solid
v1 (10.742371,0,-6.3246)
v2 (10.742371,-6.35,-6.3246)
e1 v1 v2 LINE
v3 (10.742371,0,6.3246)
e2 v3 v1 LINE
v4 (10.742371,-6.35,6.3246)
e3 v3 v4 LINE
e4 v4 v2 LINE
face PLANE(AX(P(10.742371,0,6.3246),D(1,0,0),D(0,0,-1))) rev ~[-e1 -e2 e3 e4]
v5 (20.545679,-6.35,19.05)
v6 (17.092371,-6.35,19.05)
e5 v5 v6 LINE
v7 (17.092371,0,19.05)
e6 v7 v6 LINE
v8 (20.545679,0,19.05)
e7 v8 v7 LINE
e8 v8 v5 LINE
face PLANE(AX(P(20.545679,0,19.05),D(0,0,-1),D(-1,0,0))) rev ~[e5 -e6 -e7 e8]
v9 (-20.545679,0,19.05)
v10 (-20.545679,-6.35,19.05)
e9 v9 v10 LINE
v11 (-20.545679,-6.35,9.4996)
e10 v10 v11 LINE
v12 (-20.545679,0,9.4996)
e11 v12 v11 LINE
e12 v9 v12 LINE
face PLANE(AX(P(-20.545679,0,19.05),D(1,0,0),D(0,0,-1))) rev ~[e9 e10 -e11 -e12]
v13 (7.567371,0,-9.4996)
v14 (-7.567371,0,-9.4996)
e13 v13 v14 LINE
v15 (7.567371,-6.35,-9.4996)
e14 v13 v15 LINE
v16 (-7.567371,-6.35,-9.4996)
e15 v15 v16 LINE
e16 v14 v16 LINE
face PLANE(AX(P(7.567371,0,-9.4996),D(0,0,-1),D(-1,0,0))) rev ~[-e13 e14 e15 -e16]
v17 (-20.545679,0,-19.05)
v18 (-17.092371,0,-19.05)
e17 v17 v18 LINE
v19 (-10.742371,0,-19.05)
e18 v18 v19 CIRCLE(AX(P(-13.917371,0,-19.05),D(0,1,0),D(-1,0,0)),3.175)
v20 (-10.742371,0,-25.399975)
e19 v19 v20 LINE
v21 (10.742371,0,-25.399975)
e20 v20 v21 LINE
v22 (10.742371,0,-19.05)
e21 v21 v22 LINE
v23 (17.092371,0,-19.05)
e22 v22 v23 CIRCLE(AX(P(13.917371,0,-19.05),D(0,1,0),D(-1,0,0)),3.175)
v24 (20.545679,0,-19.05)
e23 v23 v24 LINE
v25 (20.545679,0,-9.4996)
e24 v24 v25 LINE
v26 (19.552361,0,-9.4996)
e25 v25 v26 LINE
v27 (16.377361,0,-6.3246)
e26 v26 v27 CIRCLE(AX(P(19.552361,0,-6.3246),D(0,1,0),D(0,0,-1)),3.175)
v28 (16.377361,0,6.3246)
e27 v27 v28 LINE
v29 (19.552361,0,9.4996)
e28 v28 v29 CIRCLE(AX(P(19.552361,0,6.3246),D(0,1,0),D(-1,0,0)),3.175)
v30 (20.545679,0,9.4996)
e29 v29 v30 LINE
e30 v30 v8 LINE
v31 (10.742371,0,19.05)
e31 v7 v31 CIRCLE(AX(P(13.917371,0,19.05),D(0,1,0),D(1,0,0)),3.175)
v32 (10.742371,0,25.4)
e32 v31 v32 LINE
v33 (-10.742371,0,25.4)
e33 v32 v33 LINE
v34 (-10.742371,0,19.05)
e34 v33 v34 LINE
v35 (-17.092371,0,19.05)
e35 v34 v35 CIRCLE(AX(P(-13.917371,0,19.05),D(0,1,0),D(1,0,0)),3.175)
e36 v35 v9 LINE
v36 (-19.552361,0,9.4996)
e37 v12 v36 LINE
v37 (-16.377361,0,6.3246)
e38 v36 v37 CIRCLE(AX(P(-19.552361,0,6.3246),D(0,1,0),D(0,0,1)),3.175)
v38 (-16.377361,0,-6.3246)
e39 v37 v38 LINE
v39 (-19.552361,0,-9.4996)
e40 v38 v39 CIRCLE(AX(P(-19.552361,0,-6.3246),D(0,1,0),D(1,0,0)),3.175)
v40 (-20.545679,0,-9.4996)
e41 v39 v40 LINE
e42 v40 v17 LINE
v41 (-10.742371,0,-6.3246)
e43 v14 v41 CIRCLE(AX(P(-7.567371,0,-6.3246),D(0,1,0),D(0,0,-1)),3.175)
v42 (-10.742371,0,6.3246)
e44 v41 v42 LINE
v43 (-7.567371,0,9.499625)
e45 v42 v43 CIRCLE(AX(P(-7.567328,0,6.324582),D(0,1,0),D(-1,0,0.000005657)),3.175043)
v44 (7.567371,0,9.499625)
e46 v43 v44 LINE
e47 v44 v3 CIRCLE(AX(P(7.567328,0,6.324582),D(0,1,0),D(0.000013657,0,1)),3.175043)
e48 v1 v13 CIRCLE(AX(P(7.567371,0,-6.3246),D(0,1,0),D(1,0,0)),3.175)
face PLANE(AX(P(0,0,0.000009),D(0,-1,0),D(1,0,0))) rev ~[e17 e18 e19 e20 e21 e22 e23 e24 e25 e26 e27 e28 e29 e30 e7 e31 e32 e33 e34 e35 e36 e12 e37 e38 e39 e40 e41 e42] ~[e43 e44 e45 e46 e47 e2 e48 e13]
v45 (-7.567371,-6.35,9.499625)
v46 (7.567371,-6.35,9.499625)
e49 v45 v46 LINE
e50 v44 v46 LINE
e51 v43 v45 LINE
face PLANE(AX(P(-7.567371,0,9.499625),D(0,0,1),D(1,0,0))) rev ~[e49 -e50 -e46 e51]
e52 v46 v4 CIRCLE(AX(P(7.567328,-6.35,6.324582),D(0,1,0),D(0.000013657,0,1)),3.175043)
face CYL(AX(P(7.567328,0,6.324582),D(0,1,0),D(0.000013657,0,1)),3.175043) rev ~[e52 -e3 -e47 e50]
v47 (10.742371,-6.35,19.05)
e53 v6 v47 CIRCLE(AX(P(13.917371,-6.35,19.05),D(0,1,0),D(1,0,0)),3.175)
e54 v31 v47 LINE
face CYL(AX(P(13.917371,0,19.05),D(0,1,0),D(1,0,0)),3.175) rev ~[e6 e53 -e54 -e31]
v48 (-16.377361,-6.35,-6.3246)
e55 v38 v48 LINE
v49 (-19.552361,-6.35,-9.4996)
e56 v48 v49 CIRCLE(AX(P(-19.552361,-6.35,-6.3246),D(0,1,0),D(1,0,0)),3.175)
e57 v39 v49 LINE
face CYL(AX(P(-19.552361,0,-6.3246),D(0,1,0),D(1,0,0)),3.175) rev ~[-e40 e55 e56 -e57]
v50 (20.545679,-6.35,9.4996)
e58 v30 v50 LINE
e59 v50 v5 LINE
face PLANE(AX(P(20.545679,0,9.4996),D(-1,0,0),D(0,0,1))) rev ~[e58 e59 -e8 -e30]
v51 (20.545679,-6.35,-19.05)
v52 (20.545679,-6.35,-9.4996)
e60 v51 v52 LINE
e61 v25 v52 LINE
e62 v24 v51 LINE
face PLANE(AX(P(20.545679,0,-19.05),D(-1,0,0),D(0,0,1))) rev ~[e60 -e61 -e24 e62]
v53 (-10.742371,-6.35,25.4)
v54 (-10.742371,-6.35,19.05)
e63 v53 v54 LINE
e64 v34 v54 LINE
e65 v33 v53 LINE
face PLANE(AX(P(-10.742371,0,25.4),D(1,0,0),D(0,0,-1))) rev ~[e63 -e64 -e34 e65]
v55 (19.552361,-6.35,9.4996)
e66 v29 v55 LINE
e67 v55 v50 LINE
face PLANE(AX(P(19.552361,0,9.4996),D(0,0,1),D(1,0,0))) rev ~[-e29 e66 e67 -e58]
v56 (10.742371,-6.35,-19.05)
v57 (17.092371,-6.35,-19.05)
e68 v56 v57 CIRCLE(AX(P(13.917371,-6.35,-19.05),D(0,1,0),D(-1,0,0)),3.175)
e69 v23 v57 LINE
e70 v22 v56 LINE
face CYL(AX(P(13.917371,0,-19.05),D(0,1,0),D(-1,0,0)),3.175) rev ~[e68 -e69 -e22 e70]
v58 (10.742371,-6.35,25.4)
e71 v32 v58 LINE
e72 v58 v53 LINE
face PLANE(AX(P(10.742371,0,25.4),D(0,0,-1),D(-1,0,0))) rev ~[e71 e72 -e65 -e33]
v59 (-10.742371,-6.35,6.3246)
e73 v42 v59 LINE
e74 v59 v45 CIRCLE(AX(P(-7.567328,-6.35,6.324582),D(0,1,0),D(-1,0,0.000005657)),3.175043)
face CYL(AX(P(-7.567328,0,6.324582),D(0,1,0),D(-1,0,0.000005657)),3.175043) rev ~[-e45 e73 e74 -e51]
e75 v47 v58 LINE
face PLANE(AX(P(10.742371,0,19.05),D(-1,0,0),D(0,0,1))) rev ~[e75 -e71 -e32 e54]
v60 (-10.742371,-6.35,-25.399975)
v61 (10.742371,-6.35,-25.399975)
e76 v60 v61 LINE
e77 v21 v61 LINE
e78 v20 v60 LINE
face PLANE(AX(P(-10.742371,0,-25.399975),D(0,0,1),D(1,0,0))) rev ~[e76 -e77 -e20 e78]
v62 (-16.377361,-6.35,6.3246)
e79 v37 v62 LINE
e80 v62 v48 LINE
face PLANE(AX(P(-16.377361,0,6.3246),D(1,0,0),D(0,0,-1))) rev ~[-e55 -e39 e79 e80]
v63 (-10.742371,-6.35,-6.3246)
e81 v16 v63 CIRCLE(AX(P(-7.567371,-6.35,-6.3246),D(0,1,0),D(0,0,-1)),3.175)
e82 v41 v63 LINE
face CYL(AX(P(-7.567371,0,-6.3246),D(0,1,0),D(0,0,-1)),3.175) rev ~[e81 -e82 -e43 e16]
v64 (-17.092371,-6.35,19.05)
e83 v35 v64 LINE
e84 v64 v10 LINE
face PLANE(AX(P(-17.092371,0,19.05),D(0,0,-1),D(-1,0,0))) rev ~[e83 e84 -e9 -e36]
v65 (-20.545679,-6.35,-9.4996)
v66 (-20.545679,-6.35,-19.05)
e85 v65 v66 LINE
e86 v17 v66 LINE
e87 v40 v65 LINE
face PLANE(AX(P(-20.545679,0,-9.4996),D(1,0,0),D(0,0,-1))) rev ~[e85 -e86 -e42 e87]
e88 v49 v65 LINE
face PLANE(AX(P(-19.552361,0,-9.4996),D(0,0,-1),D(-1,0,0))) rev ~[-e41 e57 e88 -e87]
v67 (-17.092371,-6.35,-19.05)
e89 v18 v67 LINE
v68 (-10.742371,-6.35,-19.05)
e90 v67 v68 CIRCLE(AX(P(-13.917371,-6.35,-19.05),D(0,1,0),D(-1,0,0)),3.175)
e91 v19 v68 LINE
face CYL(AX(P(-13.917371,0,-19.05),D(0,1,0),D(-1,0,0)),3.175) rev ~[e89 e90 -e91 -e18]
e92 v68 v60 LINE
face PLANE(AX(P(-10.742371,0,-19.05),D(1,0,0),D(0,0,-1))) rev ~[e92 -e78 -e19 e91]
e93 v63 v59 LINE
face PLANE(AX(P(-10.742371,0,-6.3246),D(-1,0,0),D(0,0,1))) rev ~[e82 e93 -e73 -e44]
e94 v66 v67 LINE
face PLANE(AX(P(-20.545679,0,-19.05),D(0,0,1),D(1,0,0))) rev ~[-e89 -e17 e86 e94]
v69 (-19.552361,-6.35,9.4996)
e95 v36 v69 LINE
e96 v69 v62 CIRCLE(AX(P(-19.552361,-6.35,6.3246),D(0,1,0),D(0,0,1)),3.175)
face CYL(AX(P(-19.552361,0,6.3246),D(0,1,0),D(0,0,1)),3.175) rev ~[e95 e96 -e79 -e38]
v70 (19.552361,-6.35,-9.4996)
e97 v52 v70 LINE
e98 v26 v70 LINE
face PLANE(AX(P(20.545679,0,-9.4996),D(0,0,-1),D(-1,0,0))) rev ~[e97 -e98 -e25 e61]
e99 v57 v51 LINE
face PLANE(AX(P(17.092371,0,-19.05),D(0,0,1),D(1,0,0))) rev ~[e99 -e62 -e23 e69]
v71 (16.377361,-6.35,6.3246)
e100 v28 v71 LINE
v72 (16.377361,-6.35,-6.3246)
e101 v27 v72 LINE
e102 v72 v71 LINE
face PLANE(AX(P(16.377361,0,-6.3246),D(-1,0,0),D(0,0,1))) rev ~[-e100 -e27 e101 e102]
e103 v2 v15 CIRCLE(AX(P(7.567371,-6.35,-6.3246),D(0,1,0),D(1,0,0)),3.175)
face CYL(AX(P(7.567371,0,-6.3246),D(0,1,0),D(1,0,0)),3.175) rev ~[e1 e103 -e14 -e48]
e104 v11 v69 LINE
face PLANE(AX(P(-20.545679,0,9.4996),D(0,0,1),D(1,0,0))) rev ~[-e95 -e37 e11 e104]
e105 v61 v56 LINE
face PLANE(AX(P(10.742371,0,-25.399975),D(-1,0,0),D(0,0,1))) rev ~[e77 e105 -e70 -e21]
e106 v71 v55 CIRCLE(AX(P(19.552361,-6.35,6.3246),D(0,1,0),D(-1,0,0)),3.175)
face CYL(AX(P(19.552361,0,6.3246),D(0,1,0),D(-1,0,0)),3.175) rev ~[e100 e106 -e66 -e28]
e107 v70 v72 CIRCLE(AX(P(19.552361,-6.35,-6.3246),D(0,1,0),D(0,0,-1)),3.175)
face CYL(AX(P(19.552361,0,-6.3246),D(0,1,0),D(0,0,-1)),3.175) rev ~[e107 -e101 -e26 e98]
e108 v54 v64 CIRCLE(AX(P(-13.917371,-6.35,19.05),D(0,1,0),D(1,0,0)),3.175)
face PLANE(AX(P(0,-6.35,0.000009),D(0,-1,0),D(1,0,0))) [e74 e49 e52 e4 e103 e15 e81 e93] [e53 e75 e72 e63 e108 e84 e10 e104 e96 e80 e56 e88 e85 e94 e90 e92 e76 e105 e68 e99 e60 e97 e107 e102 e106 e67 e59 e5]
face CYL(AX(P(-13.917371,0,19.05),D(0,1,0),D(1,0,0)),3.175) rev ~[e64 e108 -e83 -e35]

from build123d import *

# Parameters (mm, degrees)
F1_DEPTH = 6.35


# Not quite as in the source:
# - ends of sketch curves that miss each other by under 0.0002 mm in the source are joined


with BuildPart() as f1:
    # F0 (on Front) → F1 (new body)
    with BuildSketch(Plane.XZ):
        with BuildLine():
            ThreePointArc((10.7423712, -19.0500001571), (13.9173712, -15.8750001571), (17.0923712, -19.0500001571))
            Line((17.0923712, -19.0500001571), (20.545679, -19.0500001571))
            Line((20.545679, -19.0500001571), (20.545679, -9.4996001571))
            Line((20.545679, -9.4996001571), (19.5523612, -9.4996001571))
            ThreePointArc((19.5523612, -9.4996001571), (17.3072971697, -8.5696641874), (16.3773612, -6.3246001571))
            Line((16.3773612, -6.3246001571), (16.3773612, 6.3245998429))
            ThreePointArc((16.3773612, 6.3245998429), (17.3072971697, 8.5696638731), (19.5523612, 9.4995998429))
            Line((19.5523612, 9.4995998429), (20.545679, 9.4995998429))
            Line((20.545679, 9.4995998429), (20.545679, 19.0499998429))
            Line((20.545679, 19.0499998429), (17.0923712, 19.0499998429))
            ThreePointArc((17.0923712, 19.0499998429), (13.9173712, 15.8749998429), (10.7423712, 19.0499998429))
            Line((10.7423712, 19.0499998429), (10.7423712, 25.3999998429))
            Line((10.7423712, 25.3999998429), (-10.7423712, 25.3999998429))
            Line((-10.7423712, 25.3999998429), (-10.7423712, 19.0499998429))
            ThreePointArc((-10.7423712, 19.0499998429), (-13.9173712, 15.8749998429), (-17.0923712, 19.0499998429))
            Line((-17.0923712, 19.0499998429), (-20.545679, 19.0499998429))
            Line((-20.545679, 19.0499998429), (-20.545679, 9.4995998429))
            Line((-20.545679, 9.4995998429), (-19.5523612, 9.4995998429))
            ThreePointArc((-19.5523612, 9.4995998429), (-17.3072971697, 8.5696638731), (-16.3773612, 6.3245998429))
            Line((-16.3773612, 6.3245998429), (-16.3773612, -6.3246001571))
            ThreePointArc((-16.3773612, -6.3246001571), (-17.3072971697, -8.5696641874), (-19.5523612, -9.4996001571))
            Line((-19.5523612, -9.4996001571), (-20.545679, -9.4996001571))
            Line((-20.545679, -9.4996001571), (-20.545679, -19.0500001571))
            Line((-20.545679, -19.0500001571), (-17.0923712, -19.0500001571))
            ThreePointArc((-17.0923712, -19.0500001571), (-13.9173712, -15.8750001571), (-10.7423712, -19.0500001571))
            Line((-10.7423712, -19.0500001571), (-10.7423712, -25.3999747571))
            Line((-10.7423712, -25.3999747571), (10.7423712, -25.3999747571))
            Line((10.7423712, -25.3999747571), (10.7423712, -19.0500001571))
        make_face()
        with BuildLine():
            Line((-7.5673712, 9.4996252429), (7.5673712, 9.4996252429))
            ThreePointArc((7.5673712, 9.4996252429), (9.8124352303, 8.5696638731), (10.7423712, 6.3245998429))
            Line((10.7423712, 6.3245998429), (10.7423712, -6.3246001571))
            ThreePointArc((10.7423712, -6.3246001571), (9.8124352303, -8.5696641874), (7.5673712, -9.4996001571))
            Line((7.5673712, -9.4996001571), (-7.5673712, -9.4996001571))
            ThreePointArc((-7.5673712, -9.4996001571), (-9.8124352303, -8.5696641874), (-10.7423712, -6.3246001571))
            Line((-10.7423712, -6.3246001571), (-10.7423712, 6.3245998429))
            ThreePointArc((-10.7423712, 6.3245998429), (-9.8124352303, 8.5696638731), (-7.5673712, 9.4996252429))
        make_face(mode=Mode.SUBTRACT)
    extrude(amount=F1_DEPTH)


solid = f1.part
